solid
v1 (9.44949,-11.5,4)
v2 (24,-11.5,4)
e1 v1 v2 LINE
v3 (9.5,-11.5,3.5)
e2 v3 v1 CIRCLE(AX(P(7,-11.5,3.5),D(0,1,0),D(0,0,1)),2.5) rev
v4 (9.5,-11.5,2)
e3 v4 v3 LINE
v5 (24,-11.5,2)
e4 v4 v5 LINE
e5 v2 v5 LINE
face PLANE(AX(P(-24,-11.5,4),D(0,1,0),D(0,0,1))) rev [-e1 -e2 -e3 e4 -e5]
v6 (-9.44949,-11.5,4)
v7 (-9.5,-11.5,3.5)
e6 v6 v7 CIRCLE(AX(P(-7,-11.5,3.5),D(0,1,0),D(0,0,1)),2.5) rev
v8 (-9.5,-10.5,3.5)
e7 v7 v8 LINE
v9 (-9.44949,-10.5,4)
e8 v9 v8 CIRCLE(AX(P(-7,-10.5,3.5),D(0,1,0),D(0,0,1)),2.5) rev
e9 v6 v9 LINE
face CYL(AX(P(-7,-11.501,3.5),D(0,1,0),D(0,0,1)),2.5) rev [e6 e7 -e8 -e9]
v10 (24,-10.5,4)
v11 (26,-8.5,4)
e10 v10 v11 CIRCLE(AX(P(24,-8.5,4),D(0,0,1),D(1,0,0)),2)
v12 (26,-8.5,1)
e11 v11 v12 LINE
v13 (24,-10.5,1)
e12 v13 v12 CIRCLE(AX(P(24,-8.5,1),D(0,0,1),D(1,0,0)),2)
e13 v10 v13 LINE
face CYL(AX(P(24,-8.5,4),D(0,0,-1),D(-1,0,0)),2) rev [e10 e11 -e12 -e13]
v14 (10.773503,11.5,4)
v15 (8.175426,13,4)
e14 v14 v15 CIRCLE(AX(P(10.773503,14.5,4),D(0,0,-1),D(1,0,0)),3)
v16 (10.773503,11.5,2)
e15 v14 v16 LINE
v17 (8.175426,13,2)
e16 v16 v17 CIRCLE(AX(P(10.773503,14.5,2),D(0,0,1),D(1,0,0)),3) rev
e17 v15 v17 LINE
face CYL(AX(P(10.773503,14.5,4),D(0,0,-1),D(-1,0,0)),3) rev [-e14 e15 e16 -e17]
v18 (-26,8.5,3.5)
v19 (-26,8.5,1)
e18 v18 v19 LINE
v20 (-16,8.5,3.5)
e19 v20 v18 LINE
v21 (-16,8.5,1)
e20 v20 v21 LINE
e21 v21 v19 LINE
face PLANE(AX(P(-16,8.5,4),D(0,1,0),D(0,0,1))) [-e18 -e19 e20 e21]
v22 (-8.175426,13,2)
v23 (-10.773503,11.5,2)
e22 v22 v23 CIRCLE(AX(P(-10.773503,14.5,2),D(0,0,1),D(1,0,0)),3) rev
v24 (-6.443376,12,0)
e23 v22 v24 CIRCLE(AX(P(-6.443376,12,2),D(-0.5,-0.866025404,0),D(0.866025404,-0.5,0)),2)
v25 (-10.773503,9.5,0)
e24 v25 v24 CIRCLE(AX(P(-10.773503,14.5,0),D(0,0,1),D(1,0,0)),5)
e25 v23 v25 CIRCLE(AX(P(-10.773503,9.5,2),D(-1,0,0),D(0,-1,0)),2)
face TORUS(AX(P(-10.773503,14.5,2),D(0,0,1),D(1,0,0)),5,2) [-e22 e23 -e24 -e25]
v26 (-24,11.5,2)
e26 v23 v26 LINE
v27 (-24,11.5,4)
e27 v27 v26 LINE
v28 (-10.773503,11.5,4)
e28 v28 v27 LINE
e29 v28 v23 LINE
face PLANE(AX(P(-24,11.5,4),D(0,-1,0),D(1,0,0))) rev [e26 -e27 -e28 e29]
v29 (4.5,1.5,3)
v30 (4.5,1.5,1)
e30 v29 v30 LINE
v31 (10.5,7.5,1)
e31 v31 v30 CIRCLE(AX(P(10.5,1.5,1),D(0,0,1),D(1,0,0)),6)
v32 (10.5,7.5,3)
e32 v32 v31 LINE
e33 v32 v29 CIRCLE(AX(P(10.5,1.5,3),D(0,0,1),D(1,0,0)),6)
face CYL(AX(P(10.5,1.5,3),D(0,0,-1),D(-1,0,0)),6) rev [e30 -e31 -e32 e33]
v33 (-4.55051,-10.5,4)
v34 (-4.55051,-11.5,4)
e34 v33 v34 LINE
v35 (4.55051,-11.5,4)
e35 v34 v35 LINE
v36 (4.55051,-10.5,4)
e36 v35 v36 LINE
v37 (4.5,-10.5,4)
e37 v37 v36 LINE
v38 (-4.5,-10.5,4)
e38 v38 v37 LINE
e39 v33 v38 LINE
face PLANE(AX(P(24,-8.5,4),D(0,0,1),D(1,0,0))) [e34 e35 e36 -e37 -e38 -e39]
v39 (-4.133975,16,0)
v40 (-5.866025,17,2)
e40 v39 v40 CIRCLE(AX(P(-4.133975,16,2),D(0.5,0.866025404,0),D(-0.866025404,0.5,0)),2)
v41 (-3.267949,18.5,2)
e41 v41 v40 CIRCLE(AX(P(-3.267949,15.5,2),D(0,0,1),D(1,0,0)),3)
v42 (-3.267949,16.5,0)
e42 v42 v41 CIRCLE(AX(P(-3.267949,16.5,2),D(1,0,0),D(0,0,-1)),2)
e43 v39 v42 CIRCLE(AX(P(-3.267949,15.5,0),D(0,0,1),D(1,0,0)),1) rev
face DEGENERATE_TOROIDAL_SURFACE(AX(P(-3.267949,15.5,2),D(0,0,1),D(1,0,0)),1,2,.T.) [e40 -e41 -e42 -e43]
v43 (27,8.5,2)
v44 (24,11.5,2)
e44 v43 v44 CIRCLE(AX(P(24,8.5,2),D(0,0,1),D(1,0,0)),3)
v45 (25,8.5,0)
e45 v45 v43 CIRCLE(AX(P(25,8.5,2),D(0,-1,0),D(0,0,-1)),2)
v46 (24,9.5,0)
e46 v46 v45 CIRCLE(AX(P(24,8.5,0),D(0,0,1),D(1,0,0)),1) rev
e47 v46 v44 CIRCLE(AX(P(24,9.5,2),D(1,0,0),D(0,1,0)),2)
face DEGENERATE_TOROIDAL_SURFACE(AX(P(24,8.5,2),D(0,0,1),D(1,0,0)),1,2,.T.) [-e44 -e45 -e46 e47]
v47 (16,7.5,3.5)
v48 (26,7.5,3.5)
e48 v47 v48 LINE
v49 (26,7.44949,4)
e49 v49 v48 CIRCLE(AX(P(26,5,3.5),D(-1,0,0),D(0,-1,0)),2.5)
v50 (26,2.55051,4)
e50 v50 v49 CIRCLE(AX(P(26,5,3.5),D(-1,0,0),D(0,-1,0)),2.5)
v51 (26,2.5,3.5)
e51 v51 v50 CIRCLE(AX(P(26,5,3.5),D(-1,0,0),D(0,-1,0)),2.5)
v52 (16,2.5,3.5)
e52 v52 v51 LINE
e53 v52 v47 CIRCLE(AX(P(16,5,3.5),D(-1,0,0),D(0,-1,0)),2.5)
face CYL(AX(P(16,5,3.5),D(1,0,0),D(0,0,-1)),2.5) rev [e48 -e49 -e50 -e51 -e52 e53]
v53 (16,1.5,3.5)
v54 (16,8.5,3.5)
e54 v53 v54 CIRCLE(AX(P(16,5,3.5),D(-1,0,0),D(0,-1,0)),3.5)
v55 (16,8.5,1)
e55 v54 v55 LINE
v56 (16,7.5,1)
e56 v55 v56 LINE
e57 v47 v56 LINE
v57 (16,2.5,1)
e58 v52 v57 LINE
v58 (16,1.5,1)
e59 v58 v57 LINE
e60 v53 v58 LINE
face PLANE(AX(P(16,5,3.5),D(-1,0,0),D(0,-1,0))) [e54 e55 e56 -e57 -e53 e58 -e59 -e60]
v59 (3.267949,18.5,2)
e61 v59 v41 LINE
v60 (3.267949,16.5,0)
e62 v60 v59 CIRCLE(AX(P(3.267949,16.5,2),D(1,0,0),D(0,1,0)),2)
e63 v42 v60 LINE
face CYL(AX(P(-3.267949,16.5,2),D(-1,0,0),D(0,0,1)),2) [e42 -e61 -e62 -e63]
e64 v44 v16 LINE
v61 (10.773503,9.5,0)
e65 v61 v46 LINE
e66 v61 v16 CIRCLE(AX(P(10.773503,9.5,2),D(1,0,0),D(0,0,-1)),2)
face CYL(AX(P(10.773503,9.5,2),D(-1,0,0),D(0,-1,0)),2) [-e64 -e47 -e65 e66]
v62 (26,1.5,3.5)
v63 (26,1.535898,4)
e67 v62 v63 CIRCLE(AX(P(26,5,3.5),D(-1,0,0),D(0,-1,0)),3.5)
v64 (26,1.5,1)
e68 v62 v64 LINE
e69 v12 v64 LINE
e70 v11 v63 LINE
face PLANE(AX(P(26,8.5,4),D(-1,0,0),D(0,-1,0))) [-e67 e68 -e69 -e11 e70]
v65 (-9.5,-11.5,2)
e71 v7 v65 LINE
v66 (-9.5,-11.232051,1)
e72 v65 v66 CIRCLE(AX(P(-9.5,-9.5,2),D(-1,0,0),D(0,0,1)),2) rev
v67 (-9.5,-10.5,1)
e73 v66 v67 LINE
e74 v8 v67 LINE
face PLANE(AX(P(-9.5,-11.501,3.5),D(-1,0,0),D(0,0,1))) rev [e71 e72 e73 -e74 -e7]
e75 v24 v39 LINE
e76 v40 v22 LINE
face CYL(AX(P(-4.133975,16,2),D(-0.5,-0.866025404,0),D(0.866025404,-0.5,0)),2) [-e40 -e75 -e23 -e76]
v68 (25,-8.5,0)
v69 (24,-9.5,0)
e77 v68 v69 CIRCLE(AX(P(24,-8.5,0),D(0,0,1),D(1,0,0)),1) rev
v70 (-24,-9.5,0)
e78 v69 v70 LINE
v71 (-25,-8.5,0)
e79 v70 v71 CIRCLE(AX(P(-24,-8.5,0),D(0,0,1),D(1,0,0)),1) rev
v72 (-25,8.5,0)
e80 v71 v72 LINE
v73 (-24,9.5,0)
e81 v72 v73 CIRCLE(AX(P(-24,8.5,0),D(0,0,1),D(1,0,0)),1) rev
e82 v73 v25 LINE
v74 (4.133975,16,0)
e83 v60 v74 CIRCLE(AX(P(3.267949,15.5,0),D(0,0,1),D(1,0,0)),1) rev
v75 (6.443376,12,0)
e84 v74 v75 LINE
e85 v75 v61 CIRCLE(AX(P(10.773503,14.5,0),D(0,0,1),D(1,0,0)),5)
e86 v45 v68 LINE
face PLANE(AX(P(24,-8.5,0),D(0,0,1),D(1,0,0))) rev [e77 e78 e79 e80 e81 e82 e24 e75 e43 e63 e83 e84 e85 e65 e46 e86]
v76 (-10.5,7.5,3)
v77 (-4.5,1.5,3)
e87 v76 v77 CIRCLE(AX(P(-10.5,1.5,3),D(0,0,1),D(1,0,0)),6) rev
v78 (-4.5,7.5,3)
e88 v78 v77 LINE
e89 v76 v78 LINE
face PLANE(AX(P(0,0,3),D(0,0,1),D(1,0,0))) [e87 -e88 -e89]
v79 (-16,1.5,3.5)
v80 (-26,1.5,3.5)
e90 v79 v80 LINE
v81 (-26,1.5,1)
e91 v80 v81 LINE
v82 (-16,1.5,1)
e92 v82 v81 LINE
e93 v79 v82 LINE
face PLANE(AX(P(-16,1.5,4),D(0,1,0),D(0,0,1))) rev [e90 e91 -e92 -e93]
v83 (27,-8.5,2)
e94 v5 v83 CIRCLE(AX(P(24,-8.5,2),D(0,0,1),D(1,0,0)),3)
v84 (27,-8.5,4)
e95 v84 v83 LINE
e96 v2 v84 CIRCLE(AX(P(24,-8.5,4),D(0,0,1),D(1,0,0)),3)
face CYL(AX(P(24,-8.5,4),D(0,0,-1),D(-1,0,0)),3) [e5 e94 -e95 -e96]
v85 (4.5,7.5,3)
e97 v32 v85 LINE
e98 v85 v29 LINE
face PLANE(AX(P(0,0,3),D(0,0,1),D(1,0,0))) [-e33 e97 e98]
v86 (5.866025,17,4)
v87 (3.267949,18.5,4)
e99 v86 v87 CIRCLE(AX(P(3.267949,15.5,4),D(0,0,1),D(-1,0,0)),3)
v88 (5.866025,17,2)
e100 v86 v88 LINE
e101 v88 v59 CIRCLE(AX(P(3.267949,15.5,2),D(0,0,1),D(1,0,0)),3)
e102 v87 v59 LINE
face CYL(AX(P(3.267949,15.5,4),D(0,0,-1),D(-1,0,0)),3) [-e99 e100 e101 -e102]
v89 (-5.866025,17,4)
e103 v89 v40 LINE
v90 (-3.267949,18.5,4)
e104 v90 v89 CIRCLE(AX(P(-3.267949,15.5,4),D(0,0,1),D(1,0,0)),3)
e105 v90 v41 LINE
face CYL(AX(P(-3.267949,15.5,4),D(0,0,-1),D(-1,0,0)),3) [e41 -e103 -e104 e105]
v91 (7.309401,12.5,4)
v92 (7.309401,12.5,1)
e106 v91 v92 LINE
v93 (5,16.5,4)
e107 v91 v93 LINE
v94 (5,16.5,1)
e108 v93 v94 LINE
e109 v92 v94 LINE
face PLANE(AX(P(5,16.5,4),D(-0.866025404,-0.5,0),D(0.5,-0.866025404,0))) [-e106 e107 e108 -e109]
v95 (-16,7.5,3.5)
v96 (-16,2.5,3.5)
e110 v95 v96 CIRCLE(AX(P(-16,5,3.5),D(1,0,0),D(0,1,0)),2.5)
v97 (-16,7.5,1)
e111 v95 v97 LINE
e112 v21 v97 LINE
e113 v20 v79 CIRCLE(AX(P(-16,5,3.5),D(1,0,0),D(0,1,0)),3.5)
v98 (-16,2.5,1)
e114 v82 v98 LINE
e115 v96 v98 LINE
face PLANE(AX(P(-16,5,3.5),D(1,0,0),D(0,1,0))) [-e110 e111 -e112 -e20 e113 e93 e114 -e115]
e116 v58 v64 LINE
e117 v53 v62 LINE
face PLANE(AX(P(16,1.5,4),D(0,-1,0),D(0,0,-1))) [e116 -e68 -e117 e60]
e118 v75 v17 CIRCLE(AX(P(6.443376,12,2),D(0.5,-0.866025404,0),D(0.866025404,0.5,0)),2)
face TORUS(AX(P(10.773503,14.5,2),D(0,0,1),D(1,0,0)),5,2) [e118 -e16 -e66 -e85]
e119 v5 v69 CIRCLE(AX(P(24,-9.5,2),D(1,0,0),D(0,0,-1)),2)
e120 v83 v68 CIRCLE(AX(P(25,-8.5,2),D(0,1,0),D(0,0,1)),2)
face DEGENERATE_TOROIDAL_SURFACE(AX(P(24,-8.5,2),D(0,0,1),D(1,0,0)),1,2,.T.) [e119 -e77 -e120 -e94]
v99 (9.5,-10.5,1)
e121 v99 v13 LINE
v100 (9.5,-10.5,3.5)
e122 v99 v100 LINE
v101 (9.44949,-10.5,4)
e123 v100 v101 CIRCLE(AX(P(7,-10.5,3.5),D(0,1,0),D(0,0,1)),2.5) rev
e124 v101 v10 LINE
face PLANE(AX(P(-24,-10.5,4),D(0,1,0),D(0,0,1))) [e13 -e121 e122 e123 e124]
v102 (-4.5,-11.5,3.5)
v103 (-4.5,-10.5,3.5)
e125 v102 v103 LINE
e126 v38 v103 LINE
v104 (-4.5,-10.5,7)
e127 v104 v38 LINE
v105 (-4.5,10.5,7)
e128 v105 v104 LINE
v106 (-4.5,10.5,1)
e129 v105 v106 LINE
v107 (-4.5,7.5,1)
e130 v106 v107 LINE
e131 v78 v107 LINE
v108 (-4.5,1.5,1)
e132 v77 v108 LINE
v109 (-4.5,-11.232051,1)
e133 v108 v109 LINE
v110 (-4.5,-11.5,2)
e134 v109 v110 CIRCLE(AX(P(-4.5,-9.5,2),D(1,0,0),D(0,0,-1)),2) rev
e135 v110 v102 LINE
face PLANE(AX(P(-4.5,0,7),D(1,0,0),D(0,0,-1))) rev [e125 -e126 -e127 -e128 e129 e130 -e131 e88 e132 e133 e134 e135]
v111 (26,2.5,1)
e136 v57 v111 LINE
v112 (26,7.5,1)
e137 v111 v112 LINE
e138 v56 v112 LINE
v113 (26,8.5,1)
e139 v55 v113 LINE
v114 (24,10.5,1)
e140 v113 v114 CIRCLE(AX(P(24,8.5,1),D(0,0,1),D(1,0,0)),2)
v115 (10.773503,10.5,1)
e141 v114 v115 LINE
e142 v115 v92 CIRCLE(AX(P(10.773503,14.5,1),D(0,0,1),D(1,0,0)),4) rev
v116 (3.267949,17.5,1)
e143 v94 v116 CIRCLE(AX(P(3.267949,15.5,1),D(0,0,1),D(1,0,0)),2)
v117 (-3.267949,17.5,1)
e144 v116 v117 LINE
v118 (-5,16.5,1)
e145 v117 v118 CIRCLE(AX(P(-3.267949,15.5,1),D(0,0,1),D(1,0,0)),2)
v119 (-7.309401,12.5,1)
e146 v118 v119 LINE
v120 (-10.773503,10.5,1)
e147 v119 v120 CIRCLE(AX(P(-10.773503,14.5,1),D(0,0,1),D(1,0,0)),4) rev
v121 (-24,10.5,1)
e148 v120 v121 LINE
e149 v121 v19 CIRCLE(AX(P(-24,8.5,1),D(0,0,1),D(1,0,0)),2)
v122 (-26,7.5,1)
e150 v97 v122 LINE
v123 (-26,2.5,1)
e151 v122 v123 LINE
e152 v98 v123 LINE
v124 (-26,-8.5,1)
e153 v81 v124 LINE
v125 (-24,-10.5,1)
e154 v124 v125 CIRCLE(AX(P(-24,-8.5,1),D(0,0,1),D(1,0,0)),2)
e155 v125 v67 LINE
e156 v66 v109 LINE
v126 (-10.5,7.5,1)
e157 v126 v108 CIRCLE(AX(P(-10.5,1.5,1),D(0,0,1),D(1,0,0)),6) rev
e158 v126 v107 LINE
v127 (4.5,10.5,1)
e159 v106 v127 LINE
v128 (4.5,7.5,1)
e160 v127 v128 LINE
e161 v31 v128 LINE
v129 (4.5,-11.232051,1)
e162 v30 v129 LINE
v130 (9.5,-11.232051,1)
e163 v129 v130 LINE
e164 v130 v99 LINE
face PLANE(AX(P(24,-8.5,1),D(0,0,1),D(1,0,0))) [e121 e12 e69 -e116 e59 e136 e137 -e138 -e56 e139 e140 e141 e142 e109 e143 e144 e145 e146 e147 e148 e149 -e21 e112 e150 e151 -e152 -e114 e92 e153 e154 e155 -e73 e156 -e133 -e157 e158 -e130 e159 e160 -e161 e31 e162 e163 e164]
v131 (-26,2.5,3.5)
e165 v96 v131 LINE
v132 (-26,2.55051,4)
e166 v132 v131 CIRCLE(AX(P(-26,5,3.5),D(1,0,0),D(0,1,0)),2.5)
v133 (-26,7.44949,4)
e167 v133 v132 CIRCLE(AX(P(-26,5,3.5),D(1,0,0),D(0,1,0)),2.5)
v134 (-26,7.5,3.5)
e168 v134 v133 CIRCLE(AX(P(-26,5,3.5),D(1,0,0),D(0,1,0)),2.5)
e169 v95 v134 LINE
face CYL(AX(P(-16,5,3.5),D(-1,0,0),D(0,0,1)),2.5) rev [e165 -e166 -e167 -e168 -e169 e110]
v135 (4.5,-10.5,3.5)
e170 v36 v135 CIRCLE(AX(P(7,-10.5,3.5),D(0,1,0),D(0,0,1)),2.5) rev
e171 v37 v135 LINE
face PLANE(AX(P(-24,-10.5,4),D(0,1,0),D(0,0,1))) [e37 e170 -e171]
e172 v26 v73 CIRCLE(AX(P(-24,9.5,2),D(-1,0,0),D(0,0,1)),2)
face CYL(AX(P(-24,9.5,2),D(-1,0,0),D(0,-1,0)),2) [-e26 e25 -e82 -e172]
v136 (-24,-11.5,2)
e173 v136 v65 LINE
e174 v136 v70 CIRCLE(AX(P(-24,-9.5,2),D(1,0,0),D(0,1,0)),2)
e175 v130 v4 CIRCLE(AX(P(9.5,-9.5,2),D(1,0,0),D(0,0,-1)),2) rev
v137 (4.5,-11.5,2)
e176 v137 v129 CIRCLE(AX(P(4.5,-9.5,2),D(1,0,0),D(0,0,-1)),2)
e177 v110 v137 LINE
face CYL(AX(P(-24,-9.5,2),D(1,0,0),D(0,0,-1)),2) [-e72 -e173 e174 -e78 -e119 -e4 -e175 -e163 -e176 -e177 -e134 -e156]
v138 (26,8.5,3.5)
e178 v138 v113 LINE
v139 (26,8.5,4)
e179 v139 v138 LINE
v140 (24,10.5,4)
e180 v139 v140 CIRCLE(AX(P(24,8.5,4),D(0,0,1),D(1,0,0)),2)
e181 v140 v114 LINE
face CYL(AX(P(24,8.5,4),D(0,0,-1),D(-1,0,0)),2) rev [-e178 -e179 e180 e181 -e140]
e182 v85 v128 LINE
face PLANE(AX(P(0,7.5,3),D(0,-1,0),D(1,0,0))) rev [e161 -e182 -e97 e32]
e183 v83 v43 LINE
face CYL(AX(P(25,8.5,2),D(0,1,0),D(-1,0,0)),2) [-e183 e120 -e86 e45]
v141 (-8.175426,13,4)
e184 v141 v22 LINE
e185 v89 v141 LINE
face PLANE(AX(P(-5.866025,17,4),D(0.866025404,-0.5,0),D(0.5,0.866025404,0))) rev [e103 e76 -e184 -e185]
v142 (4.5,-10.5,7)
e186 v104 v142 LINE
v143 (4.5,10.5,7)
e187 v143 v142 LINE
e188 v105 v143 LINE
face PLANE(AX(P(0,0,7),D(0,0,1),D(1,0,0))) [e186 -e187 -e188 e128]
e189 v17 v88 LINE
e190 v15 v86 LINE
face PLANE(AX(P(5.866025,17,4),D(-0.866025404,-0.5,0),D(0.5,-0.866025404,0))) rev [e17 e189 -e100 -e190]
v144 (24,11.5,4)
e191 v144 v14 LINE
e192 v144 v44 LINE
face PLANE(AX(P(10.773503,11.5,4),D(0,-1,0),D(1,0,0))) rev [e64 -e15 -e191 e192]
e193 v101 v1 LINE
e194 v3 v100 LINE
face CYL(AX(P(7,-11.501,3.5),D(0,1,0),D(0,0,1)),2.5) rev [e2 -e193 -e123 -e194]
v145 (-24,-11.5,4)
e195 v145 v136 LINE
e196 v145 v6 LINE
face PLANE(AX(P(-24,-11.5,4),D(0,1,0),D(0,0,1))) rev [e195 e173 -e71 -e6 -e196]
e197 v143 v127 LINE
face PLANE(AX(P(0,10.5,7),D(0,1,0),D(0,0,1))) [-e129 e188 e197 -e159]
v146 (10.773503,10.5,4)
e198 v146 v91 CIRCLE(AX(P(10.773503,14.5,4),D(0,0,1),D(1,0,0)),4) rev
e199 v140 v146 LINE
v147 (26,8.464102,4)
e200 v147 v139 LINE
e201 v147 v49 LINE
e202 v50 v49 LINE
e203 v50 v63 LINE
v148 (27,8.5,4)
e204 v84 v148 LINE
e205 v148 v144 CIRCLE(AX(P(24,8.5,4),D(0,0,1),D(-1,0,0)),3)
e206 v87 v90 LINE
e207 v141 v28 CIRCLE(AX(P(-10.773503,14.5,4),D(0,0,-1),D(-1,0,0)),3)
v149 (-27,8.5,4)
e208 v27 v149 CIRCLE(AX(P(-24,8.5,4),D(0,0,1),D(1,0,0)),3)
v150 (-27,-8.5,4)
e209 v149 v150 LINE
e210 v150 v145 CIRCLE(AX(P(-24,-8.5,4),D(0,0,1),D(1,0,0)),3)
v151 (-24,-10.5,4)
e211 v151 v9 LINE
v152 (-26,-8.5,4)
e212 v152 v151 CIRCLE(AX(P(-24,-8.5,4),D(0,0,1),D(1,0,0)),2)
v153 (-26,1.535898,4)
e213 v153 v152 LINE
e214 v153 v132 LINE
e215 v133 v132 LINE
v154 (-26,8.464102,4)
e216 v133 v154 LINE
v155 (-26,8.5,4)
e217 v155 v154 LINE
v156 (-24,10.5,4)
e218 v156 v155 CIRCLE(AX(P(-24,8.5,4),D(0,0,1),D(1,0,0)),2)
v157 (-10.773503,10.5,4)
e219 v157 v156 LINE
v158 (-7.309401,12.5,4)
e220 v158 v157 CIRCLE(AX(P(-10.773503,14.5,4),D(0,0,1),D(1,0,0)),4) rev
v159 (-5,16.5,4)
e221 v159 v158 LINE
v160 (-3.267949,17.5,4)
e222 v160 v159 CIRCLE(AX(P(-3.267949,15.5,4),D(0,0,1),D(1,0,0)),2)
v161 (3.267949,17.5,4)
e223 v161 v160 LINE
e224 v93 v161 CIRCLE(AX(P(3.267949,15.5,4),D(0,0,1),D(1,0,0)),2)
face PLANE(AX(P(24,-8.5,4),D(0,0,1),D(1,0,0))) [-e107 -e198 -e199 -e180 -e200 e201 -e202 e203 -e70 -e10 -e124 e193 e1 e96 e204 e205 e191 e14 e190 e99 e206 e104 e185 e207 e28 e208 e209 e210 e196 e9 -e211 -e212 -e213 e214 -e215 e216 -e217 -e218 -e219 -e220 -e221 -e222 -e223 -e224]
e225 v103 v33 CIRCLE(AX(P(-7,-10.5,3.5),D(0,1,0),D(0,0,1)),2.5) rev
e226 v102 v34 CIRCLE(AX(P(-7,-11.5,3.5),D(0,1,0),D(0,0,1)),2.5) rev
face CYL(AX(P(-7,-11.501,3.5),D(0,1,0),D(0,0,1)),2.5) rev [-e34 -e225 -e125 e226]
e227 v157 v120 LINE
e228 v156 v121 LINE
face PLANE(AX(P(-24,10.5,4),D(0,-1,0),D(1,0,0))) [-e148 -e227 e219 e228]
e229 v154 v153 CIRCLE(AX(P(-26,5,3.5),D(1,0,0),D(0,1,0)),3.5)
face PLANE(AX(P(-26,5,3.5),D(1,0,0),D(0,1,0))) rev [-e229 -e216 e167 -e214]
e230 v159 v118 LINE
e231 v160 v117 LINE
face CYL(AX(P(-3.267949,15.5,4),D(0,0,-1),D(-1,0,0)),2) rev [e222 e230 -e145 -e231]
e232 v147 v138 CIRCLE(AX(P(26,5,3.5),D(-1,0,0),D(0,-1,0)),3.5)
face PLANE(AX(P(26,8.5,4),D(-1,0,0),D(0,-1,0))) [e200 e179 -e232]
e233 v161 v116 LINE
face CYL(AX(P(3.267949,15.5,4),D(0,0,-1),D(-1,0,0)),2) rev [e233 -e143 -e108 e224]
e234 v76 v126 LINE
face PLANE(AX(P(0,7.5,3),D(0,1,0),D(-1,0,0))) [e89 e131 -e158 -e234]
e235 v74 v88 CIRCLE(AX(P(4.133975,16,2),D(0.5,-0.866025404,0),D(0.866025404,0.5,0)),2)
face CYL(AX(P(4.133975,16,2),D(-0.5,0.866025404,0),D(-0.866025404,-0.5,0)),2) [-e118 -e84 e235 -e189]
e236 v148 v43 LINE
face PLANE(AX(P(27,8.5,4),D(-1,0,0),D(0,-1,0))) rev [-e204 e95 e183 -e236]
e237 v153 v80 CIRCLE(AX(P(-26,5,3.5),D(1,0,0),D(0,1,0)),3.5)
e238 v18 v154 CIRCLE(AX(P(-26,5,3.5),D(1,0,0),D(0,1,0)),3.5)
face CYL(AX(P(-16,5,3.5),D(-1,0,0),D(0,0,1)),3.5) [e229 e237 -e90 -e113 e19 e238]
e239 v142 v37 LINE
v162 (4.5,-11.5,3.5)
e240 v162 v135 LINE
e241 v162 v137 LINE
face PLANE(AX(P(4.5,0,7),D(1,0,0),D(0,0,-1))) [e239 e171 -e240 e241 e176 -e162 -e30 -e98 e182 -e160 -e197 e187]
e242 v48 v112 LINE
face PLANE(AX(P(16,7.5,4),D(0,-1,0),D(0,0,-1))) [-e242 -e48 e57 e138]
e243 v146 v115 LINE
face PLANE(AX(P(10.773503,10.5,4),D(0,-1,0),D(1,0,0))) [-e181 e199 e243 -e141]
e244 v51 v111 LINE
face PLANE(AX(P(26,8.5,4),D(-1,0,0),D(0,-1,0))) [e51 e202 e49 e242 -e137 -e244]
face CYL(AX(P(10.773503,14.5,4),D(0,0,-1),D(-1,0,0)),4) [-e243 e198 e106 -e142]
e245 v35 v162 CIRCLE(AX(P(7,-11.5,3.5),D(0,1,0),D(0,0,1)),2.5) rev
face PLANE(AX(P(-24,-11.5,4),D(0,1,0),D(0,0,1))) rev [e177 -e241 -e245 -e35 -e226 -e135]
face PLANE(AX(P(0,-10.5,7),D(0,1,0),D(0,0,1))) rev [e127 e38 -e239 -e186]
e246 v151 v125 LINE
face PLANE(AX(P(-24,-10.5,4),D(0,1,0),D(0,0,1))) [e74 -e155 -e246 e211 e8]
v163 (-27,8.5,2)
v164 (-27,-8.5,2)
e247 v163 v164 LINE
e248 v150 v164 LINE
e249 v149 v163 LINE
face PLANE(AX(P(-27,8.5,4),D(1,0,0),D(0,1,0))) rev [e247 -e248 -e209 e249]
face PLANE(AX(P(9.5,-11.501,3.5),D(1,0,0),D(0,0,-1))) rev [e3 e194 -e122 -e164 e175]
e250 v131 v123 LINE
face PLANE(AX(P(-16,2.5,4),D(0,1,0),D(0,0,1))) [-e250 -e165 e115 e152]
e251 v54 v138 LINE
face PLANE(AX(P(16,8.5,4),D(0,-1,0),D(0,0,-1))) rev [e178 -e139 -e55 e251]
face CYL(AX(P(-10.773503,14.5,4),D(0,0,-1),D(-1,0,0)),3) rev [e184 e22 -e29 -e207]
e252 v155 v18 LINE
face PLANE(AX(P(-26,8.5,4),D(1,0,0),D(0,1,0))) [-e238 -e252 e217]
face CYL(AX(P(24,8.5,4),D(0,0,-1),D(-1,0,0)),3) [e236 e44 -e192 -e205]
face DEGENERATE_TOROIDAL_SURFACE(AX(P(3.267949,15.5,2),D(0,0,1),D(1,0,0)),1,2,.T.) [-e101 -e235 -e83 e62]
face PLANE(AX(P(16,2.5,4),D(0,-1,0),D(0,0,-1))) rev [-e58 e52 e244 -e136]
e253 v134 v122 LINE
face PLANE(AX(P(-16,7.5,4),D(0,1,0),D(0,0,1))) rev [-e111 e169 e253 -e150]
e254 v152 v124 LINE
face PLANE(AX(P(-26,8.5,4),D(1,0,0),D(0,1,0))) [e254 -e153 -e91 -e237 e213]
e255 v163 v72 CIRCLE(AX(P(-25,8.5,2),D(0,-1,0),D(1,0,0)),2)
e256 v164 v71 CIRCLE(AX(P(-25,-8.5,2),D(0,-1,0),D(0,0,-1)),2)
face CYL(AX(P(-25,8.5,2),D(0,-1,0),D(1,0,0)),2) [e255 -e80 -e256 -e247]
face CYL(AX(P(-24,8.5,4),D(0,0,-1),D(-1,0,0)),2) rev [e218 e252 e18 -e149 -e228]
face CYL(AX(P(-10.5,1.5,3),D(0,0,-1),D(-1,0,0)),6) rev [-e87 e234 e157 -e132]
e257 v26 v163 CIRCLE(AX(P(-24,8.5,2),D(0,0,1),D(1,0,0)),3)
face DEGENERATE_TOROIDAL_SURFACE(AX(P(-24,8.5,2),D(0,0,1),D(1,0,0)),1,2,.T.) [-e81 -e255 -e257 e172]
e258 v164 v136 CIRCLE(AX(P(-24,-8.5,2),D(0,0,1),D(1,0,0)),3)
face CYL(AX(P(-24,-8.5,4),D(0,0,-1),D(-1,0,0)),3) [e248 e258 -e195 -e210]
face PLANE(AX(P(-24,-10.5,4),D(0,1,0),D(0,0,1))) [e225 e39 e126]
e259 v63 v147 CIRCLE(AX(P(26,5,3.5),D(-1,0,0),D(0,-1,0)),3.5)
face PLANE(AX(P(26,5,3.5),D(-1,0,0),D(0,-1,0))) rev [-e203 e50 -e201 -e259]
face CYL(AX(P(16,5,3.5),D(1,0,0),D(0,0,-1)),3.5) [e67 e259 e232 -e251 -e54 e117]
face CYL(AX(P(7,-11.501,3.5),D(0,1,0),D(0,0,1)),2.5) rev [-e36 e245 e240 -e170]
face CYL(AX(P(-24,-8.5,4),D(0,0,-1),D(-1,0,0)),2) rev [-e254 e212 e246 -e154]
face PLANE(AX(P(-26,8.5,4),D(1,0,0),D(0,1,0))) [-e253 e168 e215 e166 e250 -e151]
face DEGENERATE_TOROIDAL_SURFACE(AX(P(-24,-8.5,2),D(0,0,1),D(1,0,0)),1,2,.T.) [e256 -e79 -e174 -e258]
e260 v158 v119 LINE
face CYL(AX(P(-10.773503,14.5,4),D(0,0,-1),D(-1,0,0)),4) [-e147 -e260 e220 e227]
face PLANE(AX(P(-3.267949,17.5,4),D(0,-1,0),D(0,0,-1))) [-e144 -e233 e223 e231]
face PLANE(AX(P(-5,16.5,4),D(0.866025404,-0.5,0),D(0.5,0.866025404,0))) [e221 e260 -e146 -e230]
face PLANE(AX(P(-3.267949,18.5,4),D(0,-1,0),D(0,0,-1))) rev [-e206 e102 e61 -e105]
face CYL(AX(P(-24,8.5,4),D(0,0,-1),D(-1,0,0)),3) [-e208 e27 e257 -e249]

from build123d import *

# Parameters (mm, degrees)
BOSS_EXTRUDE1_DEPTH = 4
SHELL1_T            = -1
BOSS_EXTRUDE2_START = -26
BOSS_EXTRUDE2_DEPTH = 10
BOSS_EXTRUDE3_START = 16
BOSS_EXTRUDE3_DEPTH = 10
BOSS_EXTRUDE5_DEPTH = 2
SKETCH4_3_W         = 9
SKETCH4_3_H         = 21
BOSS_EXTRUDE6_DEPTH = 6
CUT_EXTRUDE1_REACH  = 35.47
FILLET1_R           = 2


with BuildPart() as part:
    # Sketch2 → Boss-Extrude1 (new body)
    with BuildSketch(Plane.XY):
        with BuildLine():
            Line((-3.267949192, 18.5), (3.267949192, 18.5))
            ThreePointArc((3.267949192, 18.5), (4.767949192, 18.098076211), (5.866025404, 17))
            Line((5.866025404, 17), (8.175426481, 13))
            ThreePointArc((8.175426481, 13), (9.273502692, 11.901923789), (10.773502692, 11.5))
            Line((10.773502692, 11.5), (24, 11.5))
            ThreePointArc((24, 11.5), (26.121320344, 10.621320344), (27, 8.5))
            Line((27, 8.5), (27, -8.5))
            ThreePointArc((27, -8.5), (26.121320344, -10.621320344), (24, -11.5))
            Line((24, -11.5), (-24, -11.5))
            ThreePointArc((-24, -11.5), (-26.121320344, -10.621320344), (-27, -8.5))
            Line((-27, -8.5), (-27, 8.5))
            ThreePointArc((-27, 8.5), (-26.121320344, 10.621320344), (-24, 11.5))
            Line((-24, 11.5), (-10.773502692, 11.5))
            ThreePointArc((-10.773502692, 11.5), (-9.273502692, 11.901923789), (-8.175426481, 13))
            Line((-8.175426481, 13), (-5.866025404, 17))
            ThreePointArc((-5.866025404, 17), (-4.767949192, 18.098076211), (-3.267949192, 18.5))
        make_face()
    extrude(amount=BOSS_EXTRUDE1_DEPTH)

    # Shell1
    shell1_openings = [part.faces().sort_by_distance(p)[0] for p in [
        (0, 1.077008716, 4),
    ]]
    offset(amount=SHELL1_T, openings=shell1_openings, kind=Kind.INTERSECTION)

    # Sketch3 → Boss-Extrude2 (add)
    with BuildSketch(Plane(origin=(0, 0, 0), x_dir=(0, 0, -1), z_dir=(1, 0, 0)).offset(BOSS_EXTRUDE2_START)):
        with BuildLine():
            Line((-1, 2.5), (-3.5, 2.5))
            ThreePointArc((-3.5, 2.5), (-6, 5), (-3.5, 7.5))
            Line((-3.5, 7.5), (-1, 7.5))
            Line((-1, 7.5), (-1, 8.5))
            Line((-1, 8.5), (-3.5, 8.5))
            ThreePointArc((-3.5, 8.5), (-7, 5), (-3.5, 1.5))
            Line((-3.5, 1.5), (-1, 1.5))
            Line((-1, 1.5), (-1, 2.5))
        make_face()
    extrude(amount=BOSS_EXTRUDE2_DEPTH)

    # Sketch3<3> → Boss-Extrude3 (add)
    with BuildSketch(Plane(origin=(0, 0, 0), x_dir=(0, 0, -1), z_dir=(1, 0, 0)).offset(BOSS_EXTRUDE3_START)):
        with BuildLine():
            Line((-6.672077255, 6.479163916), (-5.765769468, 6.056545654))
            ThreePointArc((-5.765769468, 6.056545654), (-4.843249021, 7.108478615), (-3.5, 7.5))
            Line((-3.5, 7.5), (-1, 7.5))
            Line((-1, 7.5), (-1, 8.5))
            Line((-1, 8.5), (-3.5, 8.5))
            ThreePointArc((-3.5, 8.5), (-5.380548629, 7.95187006), (-6.672077255, 6.479163916))
        make_face()
        with BuildLine():
            Line((-1, 2.5), (-3.5, 2.5))
            ThreePointArc((-3.5, 2.5), (-5.608478615, 3.656750979), (-5.765769468, 6.056545654))
            Line((-5.765769468, 6.056545654), (-6.672077255, 6.479163916))
            ThreePointArc((-6.672077255, 6.479163916), (-6.45187006, 3.119451371), (-3.5, 1.5))
            Line((-3.5, 1.5), (-1, 1.5))
            Line((-1, 1.5), (-1, 2.5))
        make_face()
    extrude(amount=BOSS_EXTRUDE3_DEPTH)

    # Sketch4 → Boss-Extrude5 (add)
    with BuildSketch(Plane.XY.offset(1)):
        with BuildLine():
            Line((-4.5, 1.5), (-4.5, 7.5))
            Line((-4.5, 7.5), (-10.5, 7.5))
            ThreePointArc((-10.5, 7.5), (-6.257359313, 5.742640687), (-4.5, 1.5))
        make_face()
        with BuildLine():
            Line((10.5, 7.5), (4.5, 7.5))
            Line((4.5, 7.5), (4.5, 1.5))
            ThreePointArc((4.5, 1.5), (6.257359313, 5.742640687), (10.5, 7.5))
        make_face()
    extrude(amount=BOSS_EXTRUDE5_DEPTH)

    # Sketch4<3> → Boss-Extrude6 (add)
    with BuildSketch(Plane.XY.offset(1)):
        Rectangle(SKETCH4_3_W, SKETCH4_3_H)
    extrude(amount=BOSS_EXTRUDE6_DEPTH)

    # Sketch5 → Cut-Extrude1 (cut, up to next)
    with BuildSketch(Plane(origin=(0, 0, 0), x_dir=(1, 0, 0), z_dir=(0, 1, 0)), mode=Mode.PRIVATE) as cut_extrude1_sk1:
        with BuildLine():
            Line((-9.5, -3.5), (-9.5, -1))
            Line((-9.5, -1), (-4.5, -1))
            Line((-4.5, -1), (-4.5, -3.5))
            ThreePointArc((-4.5, -3.5), (-7, -6), (-9.5, -3.5))
        make_face()
    cut_extrude1_tool1 = extrude(cut_extrude1_sk1.sketch, amount=-CUT_EXTRUDE1_REACH, mode=Mode.PRIVATE) & part.part
    # Sketch5 → Cut-Extrude1 (cut, up to next)
    with BuildSketch(Plane(origin=(0, 0, 0), x_dir=(1, 0, 0), z_dir=(0, 1, 0)), mode=Mode.PRIVATE) as cut_extrude1_sk2:
        with BuildLine():
            Line((4.5, -3.5), (4.5, -1))
            Line((4.5, -1), (9.5, -1))
            Line((9.5, -1), (9.5, -3.5))
            ThreePointArc((9.5, -3.5), (7, -6), (4.5, -3.5))
        make_face()
    cut_extrude1_tool2 = extrude(cut_extrude1_sk2.sketch, amount=-CUT_EXTRUDE1_REACH, mode=Mode.PRIVATE) & part.part
    add(cut_extrude1_tool1.solids().sort_by_distance((-7, 0, 3.266625))[0], mode=Mode.SUBTRACT)
    add(cut_extrude1_tool2.solids().sort_by_distance((7, 0, 3.266625))[0], mode=Mode.SUBTRACT)

    # Fillet1
    # the kernel refuses this fillet: 2 mm, written as the material it takes off along each edge
    with BuildSketch(Plane(origin=(27, 8.5, 0), x_dir=(0, 0, 1), z_dir=(0, -1, 0)), Plane(origin=(-27, -8.5, 0), x_dir=(0, 0, 1), z_dir=(0, 1, 0))) as fillet1_piece_1:
        with BuildLine():
            CenterArc((FILLET1_R, FILLET1_R), FILLET1_R, 180, 90)
            Line((0, FILLET1_R), (0, 0))
            Line((0, 0), (FILLET1_R, 0))
        make_face()
    extrude(amount=17, mode=Mode.SUBTRACT)
    with BuildSketch(Plane(origin=(24, 8.5, 0), x_dir=(0, 1, 0), z_dir=(-1, 0, 0))) as fillet1_piece_2:
        with BuildLine():
            CenterArc((3 - FILLET1_R, -FILLET1_R), FILLET1_R, 0, 90)
            Line((3 - FILLET1_R, 0), (3, 0))
            Line((3, 0), (3, -FILLET1_R))
        make_face()
    revolve(axis=Axis((24, 8.5, 0), (0, 0, -1)), revolution_arc=90, mode=Mode.SUBTRACT)
    with BuildSketch(Plane(origin=(10.773502692, 11.5, 0), x_dir=(0, 0, 1), z_dir=(1, 0, 0)), Plane(origin=(-24, 11.5, 0), x_dir=(0, 0, 1), z_dir=(1, 0, 0))) as fillet1_piece_3:
        with BuildLine():
            CenterArc((FILLET1_R, FILLET1_R), FILLET1_R, 180, 90)
            Line((0, FILLET1_R), (0, 0))
            Line((0, 0), (FILLET1_R, 0))
        make_face()
    extrude(amount=13.226497308, mode=Mode.SUBTRACT)
    with BuildSketch(Plane(origin=(10.773502692, 14.5, 0), x_dir=(-0.8660254037844389, -0.49999999999999956, 0), z_dir=(-0.49999999999999956, 0.8660254037844389, 0))) as fillet1_piece_4:
        with BuildLine():
            CenterArc((3 + FILLET1_R, FILLET1_R), FILLET1_R, 180, 90)
            Line((3 + FILLET1_R, 0), (3, 0))
            Line((3, 0), (3, FILLET1_R))
        make_face()
    revolve(axis=Axis((10.773502692, 14.5, 0), (0, 0, 1)), revolution_arc=60, mode=Mode.SUBTRACT)
    with BuildSketch(Plane(origin=(5.866025404, 17, 0), x_dir=(0, 0, 1), z_dir=(0.500000000000004, -0.8660254037844364, 0)), Plane(origin=(-8.175426481, 13, 0), x_dir=(0, 0, 1), z_dir=(0.5000000000000043, 0.8660254037844362, 0))) as fillet1_piece_5:
        with BuildLine():
            CenterArc((FILLET1_R, FILLET1_R), FILLET1_R, 180, 90)
            Line((0, FILLET1_R), (0, 0))
            Line((0, 0), (FILLET1_R, 0))
        make_face()
    extrude(amount=4.618802154, mode=Mode.SUBTRACT)
    with BuildSketch(Plane(origin=(3.267949192, 15.5, 0), x_dir=(0, 1, 0), z_dir=(-1, 0, 0))) as fillet1_piece_6:
        with BuildLine():
            CenterArc((3 - FILLET1_R, -FILLET1_R), FILLET1_R, 0, 90)
            Line((3 - FILLET1_R, 0), (3, 0))
            Line((3, 0), (3, -FILLET1_R))
        make_face()
    revolve(axis=Axis((3.267949192, 15.5, 0), (0, 0, -1)), revolution_arc=60, mode=Mode.SUBTRACT)
    with BuildSketch(Plane(origin=(-3.267949192, 18.5, 0), x_dir=(0, 0, 1), z_dir=(1, 0, 0))) as fillet1_piece_7:
        with BuildLine():
            CenterArc((FILLET1_R, FILLET1_R), FILLET1_R, 180, 90)
            Line((0, FILLET1_R), (0, 0))
            Line((0, 0), (FILLET1_R, 0))
        make_face()
    extrude(amount=6.535898385, mode=Mode.SUBTRACT)
    with BuildSketch(Plane(origin=(-3.267949192, 15.5, 0), x_dir=(-0.8660254037844407, 0.4999999999999964, 0), z_dir=(-0.4999999999999964, -0.8660254037844407, 0))) as fillet1_piece_8:
        with BuildLine():
            CenterArc((3 - FILLET1_R, -FILLET1_R), FILLET1_R, 0, 90)
            Line((3 - FILLET1_R, 0), (3, 0))
            Line((3, 0), (3, -FILLET1_R))
        make_face()
    revolve(axis=Axis((-3.267949192, 15.5, 0), (0, 0, -1)), revolution_arc=60, mode=Mode.SUBTRACT)
    with BuildSketch(Plane(origin=(-10.773502692, 14.5, 0), x_dir=(0, -1, 0), z_dir=(-1, 0, 0))) as fillet1_piece_9:
        with BuildLine():
            CenterArc((3 + FILLET1_R, FILLET1_R), FILLET1_R, 180, 90)
            Line((3, FILLET1_R), (3, 0))
            Line((3, 0), (3 + FILLET1_R, 0))
        make_face()
    revolve(axis=Axis((-10.773502692, 14.5, 0), (0, 0, 1)), revolution_arc=60, mode=Mode.SUBTRACT)
    with BuildSketch(Plane(origin=(-24, 8.5, 0), x_dir=(-1, 0, 0), z_dir=(0, -1, 0))) as fillet1_piece_10:
        with BuildLine():
            CenterArc((3 - FILLET1_R, -FILLET1_R), FILLET1_R, 0, 90)
            Line((3, -FILLET1_R), (3, 0))
            Line((3, 0), (3 - FILLET1_R, 0))
        make_face()
    revolve(axis=Axis((-24, 8.5, 0), (0, 0, -1)), revolution_arc=90, mode=Mode.SUBTRACT)
    with BuildSketch(Plane(origin=(-24, -8.5, 0), x_dir=(0, -1, 0), z_dir=(1, 0, 0))) as fillet1_piece_11:
        with BuildLine():
            CenterArc((3 - FILLET1_R, -FILLET1_R), FILLET1_R, 0, 90)
            Line((3 - FILLET1_R, 0), (3, 0))
            Line((3, 0), (3, -FILLET1_R))
        make_face()
    revolve(axis=Axis((-24, -8.5, 0), (0, 0, -1)), revolution_arc=90, mode=Mode.SUBTRACT)
    with BuildSketch(Plane(origin=(24, -11.5, 0), x_dir=(0, 0, 1), z_dir=(-1, 0, 0))) as fillet1_piece_12:
        with BuildLine():
            CenterArc((FILLET1_R, FILLET1_R), FILLET1_R, 180, 90)
            Line((0, FILLET1_R), (0, 0))
            Line((0, 0), (FILLET1_R, 0))
        make_face()
    extrude(amount=48, mode=Mode.SUBTRACT)
    with BuildSketch(Plane(origin=(24, -8.5, 0), x_dir=(1, 0, 0), z_dir=(0, 1, 0))) as fillet1_piece_13:
        with BuildLine():
            CenterArc((3 - FILLET1_R, -FILLET1_R), FILLET1_R, 0, 90)
            Line((3 - FILLET1_R, 0), (3, 0))
            Line((3, 0), (3, -FILLET1_R))
        make_face()
    revolve(axis=Axis((24, -8.5, 0), (0, 0, -1)), revolution_arc=90, mode=Mode.SUBTRACT)


solid = part.part
